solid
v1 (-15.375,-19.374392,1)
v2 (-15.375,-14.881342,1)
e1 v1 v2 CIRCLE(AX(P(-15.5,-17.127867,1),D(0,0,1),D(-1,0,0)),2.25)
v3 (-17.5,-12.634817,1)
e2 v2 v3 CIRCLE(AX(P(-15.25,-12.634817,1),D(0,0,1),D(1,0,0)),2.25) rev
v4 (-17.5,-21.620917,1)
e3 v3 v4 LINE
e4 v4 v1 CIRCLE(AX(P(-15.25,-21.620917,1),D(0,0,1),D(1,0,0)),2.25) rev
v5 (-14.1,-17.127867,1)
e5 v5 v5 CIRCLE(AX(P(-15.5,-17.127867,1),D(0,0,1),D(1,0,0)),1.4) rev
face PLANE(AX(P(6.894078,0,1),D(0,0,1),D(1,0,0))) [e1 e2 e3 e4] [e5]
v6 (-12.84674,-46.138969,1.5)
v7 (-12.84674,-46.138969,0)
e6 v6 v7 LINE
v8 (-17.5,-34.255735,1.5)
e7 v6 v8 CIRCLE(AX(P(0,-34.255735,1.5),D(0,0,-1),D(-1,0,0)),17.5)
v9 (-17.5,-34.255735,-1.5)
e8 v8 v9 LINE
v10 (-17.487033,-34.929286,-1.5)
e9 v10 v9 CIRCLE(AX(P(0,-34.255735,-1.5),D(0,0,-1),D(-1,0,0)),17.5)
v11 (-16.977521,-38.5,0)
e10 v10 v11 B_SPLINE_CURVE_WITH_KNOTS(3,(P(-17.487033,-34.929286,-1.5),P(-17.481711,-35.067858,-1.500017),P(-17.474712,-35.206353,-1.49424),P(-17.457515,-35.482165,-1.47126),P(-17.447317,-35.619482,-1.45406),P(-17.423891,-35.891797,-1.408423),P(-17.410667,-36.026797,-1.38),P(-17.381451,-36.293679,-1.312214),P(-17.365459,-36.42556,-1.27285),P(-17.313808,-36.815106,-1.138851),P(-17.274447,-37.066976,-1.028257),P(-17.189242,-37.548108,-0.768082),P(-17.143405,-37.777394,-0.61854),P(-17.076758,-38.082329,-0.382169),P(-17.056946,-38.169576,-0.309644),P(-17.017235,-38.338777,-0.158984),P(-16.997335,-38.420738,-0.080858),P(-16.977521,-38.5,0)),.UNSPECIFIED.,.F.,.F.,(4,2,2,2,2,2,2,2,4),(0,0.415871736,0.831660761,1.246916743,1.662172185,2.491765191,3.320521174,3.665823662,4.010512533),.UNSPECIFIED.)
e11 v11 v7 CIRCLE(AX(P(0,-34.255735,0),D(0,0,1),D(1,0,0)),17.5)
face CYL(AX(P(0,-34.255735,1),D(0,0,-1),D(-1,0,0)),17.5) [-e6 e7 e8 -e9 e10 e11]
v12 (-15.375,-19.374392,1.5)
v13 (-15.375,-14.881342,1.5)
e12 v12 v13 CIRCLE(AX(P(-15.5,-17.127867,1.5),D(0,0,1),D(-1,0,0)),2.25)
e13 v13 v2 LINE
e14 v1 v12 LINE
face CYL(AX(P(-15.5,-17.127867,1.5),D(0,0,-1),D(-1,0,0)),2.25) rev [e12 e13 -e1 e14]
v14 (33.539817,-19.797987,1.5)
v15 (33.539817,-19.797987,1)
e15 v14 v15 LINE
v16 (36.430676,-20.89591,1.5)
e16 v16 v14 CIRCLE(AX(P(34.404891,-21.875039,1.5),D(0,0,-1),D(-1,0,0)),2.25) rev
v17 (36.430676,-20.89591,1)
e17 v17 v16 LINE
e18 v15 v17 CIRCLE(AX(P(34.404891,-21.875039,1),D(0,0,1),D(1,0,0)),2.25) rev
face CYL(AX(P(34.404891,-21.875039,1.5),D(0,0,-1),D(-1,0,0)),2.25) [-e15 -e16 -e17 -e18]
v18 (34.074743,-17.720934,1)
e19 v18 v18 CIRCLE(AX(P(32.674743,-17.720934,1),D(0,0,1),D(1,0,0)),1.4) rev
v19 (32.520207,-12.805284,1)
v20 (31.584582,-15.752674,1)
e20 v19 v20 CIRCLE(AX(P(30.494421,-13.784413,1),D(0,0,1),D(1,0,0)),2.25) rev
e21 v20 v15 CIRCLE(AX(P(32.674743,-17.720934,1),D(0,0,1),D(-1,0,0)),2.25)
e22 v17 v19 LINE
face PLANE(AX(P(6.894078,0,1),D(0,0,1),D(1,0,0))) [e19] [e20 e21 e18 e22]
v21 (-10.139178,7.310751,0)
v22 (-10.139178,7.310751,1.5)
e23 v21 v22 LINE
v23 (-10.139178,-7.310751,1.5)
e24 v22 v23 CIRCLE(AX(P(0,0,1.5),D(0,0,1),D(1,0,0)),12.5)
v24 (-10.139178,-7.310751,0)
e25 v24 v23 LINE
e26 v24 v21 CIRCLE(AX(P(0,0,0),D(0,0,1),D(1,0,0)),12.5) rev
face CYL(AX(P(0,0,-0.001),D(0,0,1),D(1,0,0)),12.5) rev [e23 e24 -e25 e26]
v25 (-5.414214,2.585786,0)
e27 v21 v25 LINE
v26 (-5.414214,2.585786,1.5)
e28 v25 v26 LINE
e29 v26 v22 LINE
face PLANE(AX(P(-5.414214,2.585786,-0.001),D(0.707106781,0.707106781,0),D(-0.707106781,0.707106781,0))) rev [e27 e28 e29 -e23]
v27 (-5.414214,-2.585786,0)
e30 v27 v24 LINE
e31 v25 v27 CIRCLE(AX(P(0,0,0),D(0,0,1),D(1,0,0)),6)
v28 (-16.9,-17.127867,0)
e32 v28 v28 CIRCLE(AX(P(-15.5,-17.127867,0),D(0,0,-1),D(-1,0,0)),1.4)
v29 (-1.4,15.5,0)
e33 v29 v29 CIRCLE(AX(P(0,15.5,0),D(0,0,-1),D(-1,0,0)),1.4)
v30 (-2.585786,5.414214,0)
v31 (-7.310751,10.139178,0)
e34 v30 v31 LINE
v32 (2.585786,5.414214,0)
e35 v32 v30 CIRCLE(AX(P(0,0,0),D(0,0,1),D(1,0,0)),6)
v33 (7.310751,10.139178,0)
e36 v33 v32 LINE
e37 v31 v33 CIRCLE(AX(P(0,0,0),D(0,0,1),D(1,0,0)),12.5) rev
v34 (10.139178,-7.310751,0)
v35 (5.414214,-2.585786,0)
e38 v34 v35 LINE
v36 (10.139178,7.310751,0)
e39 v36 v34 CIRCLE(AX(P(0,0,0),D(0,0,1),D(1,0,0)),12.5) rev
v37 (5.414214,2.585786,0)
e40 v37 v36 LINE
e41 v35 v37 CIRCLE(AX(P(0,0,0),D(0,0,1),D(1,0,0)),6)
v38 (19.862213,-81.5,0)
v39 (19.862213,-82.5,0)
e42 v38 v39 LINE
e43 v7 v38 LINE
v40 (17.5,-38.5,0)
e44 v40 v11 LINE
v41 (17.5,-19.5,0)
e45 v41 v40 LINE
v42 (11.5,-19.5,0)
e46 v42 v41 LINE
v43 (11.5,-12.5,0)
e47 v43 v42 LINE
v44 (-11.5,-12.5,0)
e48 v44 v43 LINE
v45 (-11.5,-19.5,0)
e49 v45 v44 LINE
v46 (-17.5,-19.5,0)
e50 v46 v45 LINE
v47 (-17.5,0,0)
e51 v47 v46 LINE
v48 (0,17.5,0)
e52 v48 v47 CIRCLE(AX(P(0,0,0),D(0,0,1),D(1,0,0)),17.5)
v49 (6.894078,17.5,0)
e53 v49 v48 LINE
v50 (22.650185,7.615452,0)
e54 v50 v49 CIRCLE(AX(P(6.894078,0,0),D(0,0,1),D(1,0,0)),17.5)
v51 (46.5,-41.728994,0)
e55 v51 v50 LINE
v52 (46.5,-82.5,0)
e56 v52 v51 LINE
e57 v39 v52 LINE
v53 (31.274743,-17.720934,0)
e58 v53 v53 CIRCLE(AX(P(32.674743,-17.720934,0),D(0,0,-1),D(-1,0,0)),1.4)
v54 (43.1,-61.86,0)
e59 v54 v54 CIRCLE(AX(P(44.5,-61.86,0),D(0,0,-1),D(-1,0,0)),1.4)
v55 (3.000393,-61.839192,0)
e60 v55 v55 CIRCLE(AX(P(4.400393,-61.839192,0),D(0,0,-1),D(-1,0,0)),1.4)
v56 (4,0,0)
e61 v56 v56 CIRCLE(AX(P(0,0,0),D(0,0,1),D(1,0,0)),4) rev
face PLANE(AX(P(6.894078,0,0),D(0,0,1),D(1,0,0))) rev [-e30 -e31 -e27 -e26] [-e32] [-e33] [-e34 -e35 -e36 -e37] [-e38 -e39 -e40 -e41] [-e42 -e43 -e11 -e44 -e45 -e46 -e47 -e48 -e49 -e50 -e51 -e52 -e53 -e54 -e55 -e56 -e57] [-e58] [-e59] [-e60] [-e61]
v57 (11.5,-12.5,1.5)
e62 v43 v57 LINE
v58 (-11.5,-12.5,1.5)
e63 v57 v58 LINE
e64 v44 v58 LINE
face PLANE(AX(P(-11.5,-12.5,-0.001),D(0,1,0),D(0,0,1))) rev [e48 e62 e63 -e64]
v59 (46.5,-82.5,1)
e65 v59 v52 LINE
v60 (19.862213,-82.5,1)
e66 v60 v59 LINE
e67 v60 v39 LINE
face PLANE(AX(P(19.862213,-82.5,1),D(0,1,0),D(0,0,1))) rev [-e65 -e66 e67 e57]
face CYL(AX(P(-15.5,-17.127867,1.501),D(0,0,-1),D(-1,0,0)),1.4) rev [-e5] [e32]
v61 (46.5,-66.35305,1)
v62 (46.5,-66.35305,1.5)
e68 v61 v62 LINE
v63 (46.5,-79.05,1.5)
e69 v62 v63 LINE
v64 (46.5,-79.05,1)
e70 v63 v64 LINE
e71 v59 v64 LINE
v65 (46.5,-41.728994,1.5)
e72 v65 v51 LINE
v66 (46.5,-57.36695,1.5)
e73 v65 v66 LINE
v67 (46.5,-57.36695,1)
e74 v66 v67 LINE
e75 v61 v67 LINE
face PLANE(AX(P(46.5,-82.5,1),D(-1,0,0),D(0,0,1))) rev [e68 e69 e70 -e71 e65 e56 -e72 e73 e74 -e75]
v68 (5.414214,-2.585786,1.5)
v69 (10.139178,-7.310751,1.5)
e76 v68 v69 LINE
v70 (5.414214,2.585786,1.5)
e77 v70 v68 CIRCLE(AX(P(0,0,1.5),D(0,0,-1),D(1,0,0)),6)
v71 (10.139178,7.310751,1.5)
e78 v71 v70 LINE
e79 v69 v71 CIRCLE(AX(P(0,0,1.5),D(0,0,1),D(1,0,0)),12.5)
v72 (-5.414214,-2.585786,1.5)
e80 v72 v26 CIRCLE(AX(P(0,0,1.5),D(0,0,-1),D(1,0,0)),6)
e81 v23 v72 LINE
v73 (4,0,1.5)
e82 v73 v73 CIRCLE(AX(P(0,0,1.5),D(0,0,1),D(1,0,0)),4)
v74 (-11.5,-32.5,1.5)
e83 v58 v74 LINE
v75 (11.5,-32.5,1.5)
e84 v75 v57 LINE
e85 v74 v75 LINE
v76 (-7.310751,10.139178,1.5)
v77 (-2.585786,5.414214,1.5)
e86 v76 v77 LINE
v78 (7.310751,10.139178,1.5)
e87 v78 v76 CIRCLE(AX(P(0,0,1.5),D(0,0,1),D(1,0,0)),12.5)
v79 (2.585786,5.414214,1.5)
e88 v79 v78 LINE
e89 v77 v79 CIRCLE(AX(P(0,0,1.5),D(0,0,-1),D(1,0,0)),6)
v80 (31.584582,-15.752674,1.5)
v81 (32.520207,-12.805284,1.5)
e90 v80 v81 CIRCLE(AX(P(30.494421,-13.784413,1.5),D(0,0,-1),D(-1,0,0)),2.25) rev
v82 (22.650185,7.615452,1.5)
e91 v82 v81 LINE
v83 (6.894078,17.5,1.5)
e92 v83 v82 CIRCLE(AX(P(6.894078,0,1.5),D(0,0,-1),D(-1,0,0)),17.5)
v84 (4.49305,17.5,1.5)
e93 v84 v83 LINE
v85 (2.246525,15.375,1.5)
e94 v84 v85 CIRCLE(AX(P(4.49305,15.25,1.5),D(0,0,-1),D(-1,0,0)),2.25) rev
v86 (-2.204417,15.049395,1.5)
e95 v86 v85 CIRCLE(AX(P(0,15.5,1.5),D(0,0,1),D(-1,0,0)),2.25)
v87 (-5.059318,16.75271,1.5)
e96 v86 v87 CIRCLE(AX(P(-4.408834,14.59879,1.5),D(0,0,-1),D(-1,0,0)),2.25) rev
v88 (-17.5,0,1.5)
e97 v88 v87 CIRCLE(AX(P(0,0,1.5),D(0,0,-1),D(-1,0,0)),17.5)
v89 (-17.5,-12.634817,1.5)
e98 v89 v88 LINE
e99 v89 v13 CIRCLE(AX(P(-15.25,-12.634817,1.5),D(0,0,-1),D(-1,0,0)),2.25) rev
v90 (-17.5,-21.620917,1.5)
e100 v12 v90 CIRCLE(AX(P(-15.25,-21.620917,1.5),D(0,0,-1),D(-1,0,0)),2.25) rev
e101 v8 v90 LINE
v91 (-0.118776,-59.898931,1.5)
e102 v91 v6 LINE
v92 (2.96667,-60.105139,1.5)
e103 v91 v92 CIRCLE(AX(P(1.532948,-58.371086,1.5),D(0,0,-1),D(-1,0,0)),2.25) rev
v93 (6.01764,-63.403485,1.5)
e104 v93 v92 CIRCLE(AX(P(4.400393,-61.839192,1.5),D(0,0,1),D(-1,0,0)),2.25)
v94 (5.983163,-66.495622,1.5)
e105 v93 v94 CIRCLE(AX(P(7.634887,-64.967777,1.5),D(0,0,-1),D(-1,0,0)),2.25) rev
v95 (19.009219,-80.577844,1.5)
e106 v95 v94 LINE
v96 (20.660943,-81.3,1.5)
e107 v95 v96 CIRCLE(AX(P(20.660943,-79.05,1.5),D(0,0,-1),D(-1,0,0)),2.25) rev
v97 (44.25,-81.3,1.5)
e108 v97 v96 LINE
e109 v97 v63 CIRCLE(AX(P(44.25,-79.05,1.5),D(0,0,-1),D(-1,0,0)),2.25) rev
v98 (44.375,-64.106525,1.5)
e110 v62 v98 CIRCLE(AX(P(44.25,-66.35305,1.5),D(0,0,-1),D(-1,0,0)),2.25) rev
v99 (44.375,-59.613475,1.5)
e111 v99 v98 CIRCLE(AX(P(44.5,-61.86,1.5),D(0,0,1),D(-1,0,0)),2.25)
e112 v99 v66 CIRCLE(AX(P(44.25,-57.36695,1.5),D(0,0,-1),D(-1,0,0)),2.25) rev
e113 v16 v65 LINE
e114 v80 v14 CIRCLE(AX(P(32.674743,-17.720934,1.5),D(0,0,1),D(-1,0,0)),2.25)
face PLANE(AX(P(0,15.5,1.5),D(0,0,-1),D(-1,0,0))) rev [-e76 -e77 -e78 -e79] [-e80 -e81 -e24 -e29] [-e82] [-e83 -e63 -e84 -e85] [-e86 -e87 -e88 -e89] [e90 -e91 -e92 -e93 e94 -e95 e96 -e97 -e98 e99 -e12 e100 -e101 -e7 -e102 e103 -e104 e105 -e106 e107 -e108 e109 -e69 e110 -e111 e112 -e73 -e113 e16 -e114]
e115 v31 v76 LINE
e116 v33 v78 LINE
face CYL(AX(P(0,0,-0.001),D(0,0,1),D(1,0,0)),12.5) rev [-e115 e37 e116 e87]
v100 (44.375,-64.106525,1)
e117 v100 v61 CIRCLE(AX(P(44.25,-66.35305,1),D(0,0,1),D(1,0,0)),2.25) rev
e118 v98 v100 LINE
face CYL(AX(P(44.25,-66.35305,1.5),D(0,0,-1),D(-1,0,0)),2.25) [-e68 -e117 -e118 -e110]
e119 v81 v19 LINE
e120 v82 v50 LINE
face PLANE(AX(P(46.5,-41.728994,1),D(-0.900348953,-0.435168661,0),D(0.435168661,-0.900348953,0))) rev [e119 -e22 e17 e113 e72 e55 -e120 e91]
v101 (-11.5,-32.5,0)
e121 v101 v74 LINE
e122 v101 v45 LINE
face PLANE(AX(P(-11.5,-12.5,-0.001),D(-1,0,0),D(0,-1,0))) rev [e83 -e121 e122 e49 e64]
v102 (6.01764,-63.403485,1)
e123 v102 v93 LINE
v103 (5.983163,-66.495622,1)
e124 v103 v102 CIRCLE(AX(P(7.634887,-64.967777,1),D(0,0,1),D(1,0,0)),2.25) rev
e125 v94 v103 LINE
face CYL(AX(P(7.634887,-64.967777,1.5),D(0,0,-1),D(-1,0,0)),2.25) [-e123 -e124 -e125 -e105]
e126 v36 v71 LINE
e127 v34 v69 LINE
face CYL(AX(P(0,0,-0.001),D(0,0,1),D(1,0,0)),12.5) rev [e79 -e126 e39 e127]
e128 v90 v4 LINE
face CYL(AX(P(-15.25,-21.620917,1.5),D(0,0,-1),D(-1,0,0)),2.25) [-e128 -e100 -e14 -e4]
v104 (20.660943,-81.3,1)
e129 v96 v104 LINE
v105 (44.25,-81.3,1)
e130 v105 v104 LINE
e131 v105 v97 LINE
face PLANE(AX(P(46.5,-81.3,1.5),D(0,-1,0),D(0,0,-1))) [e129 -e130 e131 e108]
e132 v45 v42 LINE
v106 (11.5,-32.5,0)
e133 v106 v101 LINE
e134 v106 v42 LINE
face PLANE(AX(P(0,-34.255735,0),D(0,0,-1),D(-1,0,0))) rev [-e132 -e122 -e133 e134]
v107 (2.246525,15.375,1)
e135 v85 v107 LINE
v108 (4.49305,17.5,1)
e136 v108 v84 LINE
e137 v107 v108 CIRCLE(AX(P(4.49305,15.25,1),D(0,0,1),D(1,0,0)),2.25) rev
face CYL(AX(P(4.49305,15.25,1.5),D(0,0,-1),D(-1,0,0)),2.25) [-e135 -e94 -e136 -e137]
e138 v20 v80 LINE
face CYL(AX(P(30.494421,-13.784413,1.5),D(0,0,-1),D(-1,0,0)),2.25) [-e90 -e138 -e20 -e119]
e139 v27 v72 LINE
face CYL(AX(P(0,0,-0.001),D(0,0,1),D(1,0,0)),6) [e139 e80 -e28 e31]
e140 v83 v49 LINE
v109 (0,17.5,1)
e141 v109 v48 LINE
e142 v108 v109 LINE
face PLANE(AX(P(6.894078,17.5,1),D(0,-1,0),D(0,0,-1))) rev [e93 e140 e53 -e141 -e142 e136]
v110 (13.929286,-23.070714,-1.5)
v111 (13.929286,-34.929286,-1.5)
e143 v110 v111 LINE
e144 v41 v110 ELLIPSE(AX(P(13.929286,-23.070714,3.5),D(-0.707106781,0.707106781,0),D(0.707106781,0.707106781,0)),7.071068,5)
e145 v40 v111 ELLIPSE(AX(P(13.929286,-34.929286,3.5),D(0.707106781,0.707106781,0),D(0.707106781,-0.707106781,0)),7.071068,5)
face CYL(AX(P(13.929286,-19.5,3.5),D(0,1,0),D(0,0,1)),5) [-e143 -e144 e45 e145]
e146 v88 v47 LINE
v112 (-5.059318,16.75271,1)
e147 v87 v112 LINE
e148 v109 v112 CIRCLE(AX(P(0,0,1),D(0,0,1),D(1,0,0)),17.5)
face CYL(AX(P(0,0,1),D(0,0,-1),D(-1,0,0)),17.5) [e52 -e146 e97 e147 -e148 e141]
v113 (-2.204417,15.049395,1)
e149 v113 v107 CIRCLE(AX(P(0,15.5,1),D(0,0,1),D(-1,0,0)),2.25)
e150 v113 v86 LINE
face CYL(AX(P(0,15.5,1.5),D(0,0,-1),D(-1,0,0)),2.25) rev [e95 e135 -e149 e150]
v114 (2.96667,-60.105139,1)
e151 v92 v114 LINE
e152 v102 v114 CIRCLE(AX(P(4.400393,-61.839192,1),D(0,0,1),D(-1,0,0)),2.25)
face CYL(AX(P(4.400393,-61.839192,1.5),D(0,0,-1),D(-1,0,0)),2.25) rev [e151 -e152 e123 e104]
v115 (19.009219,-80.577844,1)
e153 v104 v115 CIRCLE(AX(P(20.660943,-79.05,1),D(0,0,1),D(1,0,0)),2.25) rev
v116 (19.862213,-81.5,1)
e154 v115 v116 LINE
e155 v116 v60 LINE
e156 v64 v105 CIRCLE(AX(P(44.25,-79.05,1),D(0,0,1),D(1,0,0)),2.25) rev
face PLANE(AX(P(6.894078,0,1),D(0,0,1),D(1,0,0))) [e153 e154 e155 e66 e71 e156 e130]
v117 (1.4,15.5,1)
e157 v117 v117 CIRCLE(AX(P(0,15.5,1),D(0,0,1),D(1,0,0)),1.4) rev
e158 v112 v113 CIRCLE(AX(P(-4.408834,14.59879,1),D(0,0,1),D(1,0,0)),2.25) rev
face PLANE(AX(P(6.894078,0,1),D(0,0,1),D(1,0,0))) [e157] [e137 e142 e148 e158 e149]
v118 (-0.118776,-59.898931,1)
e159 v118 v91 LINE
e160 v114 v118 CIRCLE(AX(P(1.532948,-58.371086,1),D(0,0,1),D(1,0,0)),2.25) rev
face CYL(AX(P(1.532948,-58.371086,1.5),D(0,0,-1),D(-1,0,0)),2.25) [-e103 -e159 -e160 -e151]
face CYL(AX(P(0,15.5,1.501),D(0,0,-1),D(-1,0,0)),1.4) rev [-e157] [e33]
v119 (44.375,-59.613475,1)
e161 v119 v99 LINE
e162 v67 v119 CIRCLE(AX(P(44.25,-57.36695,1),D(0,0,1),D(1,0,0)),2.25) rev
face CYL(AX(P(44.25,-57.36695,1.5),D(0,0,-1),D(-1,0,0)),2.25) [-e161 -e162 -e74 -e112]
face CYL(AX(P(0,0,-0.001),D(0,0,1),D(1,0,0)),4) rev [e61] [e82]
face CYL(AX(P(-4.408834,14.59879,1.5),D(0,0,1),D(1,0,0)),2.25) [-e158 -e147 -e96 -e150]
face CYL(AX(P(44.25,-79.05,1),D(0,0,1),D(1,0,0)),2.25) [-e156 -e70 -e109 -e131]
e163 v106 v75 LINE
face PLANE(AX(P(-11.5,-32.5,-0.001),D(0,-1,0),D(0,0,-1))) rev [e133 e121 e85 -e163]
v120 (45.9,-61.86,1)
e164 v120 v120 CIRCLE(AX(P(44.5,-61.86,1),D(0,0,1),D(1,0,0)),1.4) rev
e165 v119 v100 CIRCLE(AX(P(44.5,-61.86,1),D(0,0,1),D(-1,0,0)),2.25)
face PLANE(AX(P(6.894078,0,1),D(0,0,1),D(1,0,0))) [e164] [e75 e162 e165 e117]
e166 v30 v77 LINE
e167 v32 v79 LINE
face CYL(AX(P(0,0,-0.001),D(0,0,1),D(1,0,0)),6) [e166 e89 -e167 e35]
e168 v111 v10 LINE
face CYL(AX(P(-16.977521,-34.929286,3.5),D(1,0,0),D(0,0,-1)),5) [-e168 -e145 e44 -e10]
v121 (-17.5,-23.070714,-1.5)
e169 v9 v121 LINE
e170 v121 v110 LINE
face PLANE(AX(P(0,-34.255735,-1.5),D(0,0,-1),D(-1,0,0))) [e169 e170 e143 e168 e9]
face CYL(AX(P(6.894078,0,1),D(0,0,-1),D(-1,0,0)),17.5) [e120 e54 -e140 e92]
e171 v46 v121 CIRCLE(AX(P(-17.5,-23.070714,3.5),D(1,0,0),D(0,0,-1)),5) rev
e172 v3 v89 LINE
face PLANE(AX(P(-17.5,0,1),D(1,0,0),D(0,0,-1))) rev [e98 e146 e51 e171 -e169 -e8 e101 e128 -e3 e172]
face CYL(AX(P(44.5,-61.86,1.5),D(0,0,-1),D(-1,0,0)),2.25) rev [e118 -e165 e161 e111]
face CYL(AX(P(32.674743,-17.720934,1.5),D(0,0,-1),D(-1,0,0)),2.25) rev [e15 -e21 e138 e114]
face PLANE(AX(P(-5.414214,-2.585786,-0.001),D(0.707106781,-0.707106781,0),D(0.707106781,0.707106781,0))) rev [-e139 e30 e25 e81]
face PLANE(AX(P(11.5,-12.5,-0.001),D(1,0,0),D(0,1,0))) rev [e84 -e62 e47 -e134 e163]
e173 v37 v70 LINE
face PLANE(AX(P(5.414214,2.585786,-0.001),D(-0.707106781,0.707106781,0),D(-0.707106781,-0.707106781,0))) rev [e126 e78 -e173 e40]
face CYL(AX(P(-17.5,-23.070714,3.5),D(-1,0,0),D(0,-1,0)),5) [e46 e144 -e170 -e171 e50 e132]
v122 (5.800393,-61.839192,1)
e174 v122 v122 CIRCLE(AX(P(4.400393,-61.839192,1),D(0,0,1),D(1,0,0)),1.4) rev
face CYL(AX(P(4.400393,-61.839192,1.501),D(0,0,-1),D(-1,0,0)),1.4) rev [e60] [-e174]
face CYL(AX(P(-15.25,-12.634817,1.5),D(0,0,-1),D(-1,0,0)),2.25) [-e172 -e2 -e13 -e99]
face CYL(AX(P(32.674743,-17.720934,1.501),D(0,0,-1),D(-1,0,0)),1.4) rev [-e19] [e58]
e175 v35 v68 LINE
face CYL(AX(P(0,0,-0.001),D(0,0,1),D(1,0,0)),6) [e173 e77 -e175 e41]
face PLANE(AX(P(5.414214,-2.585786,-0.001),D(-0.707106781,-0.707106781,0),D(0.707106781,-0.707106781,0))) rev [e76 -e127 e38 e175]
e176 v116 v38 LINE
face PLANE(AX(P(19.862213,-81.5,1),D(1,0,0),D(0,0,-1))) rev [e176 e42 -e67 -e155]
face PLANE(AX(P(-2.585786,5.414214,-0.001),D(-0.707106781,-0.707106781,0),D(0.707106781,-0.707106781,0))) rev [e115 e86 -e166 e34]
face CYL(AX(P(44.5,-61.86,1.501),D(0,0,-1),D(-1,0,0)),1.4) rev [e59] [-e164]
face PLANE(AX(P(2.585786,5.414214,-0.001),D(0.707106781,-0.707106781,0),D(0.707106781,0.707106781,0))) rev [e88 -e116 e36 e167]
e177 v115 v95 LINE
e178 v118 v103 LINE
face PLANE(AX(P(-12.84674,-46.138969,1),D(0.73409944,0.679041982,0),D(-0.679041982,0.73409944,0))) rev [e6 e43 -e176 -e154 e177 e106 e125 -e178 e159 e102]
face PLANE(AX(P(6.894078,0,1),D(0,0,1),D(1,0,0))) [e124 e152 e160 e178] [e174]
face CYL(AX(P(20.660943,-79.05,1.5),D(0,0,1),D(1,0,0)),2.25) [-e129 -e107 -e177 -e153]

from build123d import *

# Parameters (mm, degrees)
EXTRUDE_1_DEPTH     = 1
EXTRUDE_2_DEPTH     = 0.5
FILLET_1_R          = 2.25
CUT_EXTRUDE_1_REACH = 96.714
SKETCH_3_R          = 1.4
CUT_EXTRUDE_2_REACH = 96.714
SKETCH_4_R          = 4
SKETCH_4_W          = 23
SKETCH_4_H          = 20
EXTRUDE_START       = 1.5
EXTRUDE_3_DEPTH     = 1.5
FILLET_2_R          = 5


with BuildPart() as part:
    # 스케치1 → 보스-돌출1 (new body)
    with BuildSketch(Plane.XY):
        with BuildLine():
            Line((46.5, -82.5), (46.5, -41.72899408))
            Line((46.5, -41.72899408), (22.650184607, 7.615451559))
            ThreePointArc((22.650184607, 7.615451559), (16.194067118, 14.824311152), (6.894077933, 17.5))
            Line((6.894077933, 17.5), (0, 17.5))
            ThreePointArc((0, 17.5), (-12.374368671, 12.374368671), (-17.5, 0))
            Line((-17.5, 0), (-17.5, -34.255734548))
            ThreePointArc((-17.5, -34.255734548), (-16.295213306, -40.636645401), (-12.846740193, -46.138969227))
            Line((-12.846740193, -46.138969227), (19.862213273, -81.5))
            Line((19.862213273, -81.5), (19.862213273, -82.5))
            Line((19.862213273, -82.5), (46.5, -82.5))
        make_face()
    extrude(amount=EXTRUDE_1_DEPTH)

    # 스케치2 → 보스-돌출2 (add)
    with BuildSketch(Plane(origin=(0, 0, 1), x_dir=(-1, 0, 0), z_dir=(0, 0, -1))):
        with BuildLine():
            Line((-46.5, -81.3), (-19.677213273, -81.3))
            Line((-19.677213273, -81.3), (-4.460038224, -64.848999948))
            Line((-4.460038224, -64.848999948), (-5.928237104, -63.490915985))
            ThreePointArc((-5.928237104, -63.490915985), (-6.052116384, -60.311347787), (-2.872548186, -60.187468507))
            Line((-2.872548186, -60.187468507), (-1.404349307, -61.54555247))
            Line((-1.404349307, -61.54555247), (12.846740193, -46.138969227))
            ThreePointArc((12.846740193, -46.138969227), (16.295213306, -40.636645401), (17.5, -34.255734548))
            Line((17.5, -34.255734548), (17.5, -19.377867274))
            Line((17.5, -19.377867274), (15.5, -19.377867274))
            ThreePointArc((15.5, -19.377867274), (13.25, -17.127867274), (15.5, -14.877867274))
            Line((15.5, -14.877867274), (17.5, -14.877867274))
            Line((17.5, -14.877867274), (17.5, 0))
            ThreePointArc((17.5, 0), (13.145816825, 11.551515052), (2.25, 17.354754392))
            Line((2.25, 17.354754392), (2.25, 15.5))
            ThreePointArc((2.25, 15.5), (0, 13.25), (-2.25, 15.5))
            Line((-2.25, 15.5), (-2.25, 17.5))
            Line((-2.25, 17.5), (-6.894077933, 17.5))
            ThreePointArc((-6.894077933, 17.5), (-16.194067118, 14.824311152), (-22.650184607, 7.615451559))
            Line((-22.650184607, 7.615451559), (-33.49631177, -14.824811536))
            Line((-33.49631177, -14.824811536), (-31.695613865, -15.695148857))
            ThreePointArc((-31.695613865, -15.695148857), (-30.648958207, -18.700063487), (-33.653872837, -19.746719145))
            Line((-33.653872837, -19.746719145), (-35.454570743, -18.876381824))
            Line((-35.454570743, -18.876381824), (-46.5, -41.72899408))
            Line((-46.5, -41.72899408), (-46.5, -59.61))
            Line((-46.5, -59.61), (-44.5, -59.61))
            ThreePointArc((-44.5, -59.61), (-42.25, -61.86), (-44.5, -64.11))
            Line((-44.5, -64.11), (-46.5, -64.11))
            Line((-46.5, -64.11), (-46.5, -81.3))
        make_face()
    extrude(amount=-EXTRUDE_2_DEPTH)

    # 필렛1
    # the kernel refuses this fillet: 2.25 mm, written as the material it takes off along each edge
    with BuildSketch(Plane(origin=(-17.5, -14.877867274, 1), x_dir=(0, 1, 0), z_dir=(0, 0, 1)), Plane(origin=(35.454570743, -18.876381824, 1), x_dir=(0.4351686605402659, -0.9003489528419473, 0), z_dir=(0, 0, 1)), Plane(origin=(46.5, -64.11, 1), x_dir=(0, -1, 0), z_dir=(0, 0, 1)), Plane(origin=(1.404349307, -61.54555247, 1), x_dir=(-0.6790419816174302, 0.7340994395864046, 0), z_dir=(0, 0, 1))) as fillet_1_piece_1:
        with BuildLine():
            CenterArc((2.243050189, -2.25), FILLET_1_R, 90, 86.815261463)
            Line((-0.003474906, -2.125), (-0.228127415, -2.1125))
            ThreePointArc((-0.228127415, -2.1125), (-0.225, -2), (-0.225, 0))
            Line((-0.225, 0), (0, 0.225))
            Line((0, 0.225), (2.243050189, 0.225))
            Line((2.243050189, 0.225), (2.243050189, 0))
        make_face()
    extrude(amount=6.107625472, mode=Mode.SUBTRACT)
    with BuildSketch(Plane(origin=(-17.5, -19.377867274, 1), x_dir=(0, -1, 0), z_dir=(0, 0, 1)), Plane(origin=(33.49631177, -14.824811536, 1), x_dir=(-0.4351686605402757, 0.9003489528419424, 0), z_dir=(0, 0, 1)), Plane(origin=(46.5, -59.61, 1), x_dir=(0, 1, 0), z_dir=(0, 0, 1)), Plane(origin=(4.460038224, -64.848999948, 1), x_dir=(0.679041981617429, -0.7340994395864059, 0), z_dir=(0, 0, 1))) as fillet_1_piece_2:
        with BuildLine():
            CenterArc((2.243050189, 2.25), FILLET_1_R, 183.184738537, 86.815261463)
            Line((-0.003474906, 2.125), (-0.228127415, 2.1125))
            ThreePointArc((-0.228127415, 2.1125), (-0.225, 2), (-0.225, 0))
            Line((-0.225, 0), (0, -0.225))
            Line((0, -0.225), (2.243050189, -0.225))
            Line((2.243050189, -0.225), (2.243050189, 0))
        make_face()
    extrude(amount=6.107625472, mode=Mode.SUBTRACT)
    with BuildSketch(Plane(origin=(2.25, 17.5, 1), x_dir=(-0.0016352474835574222, -0.99999866298194, 0), z_dir=(0, 0, 1))) as fillet_1_piece_3:
        with BuildLine():
            CenterArc((2.24632905, 2.246726497), FILLET_1_R, 180.093692821, 86.815261463)
            Line((-0.003667942, 2.24304719), (-0.228667641, 2.242679259))
            Line((-0.228667641, 2.242679259), (-0.224999699, -0.000367931))
            Line((-0.224999699, -0.000367931), (0.000367931, -0.224999699))
            ThreePointArc((0.000367931, -0.224999699), (2.000365257, -0.221729204), (2.11287022, -0.22467265))
            Line((2.11287022, -0.22467265), (2.125002841, 0))
        make_face()
    extrude(amount=6.107625472, mode=Mode.SUBTRACT)
    with BuildSketch(Plane(origin=(-2.25, 17.354754392, 1), x_dir=(-0.9777990320246813, -0.20954487102192756, 0), z_dir=(0, 0, 1))) as fillet_1_piece_4:
        with BuildLine():
            CenterArc((2.688404361, 2.242406315), FILLET_1_R, 179.456997301, 95.251636128)
            Line((0.438505404, 2.263729662), (0.213515509, 2.265861997))
            ThreePointArc((0.213515509, 2.265861997), (0.168649488, 1.860724645), (-0.220004782, 0.047147596))
            Line((-0.220004782, 0.047147596), (-0.018469954, -0.224240631))
            ThreePointArc((-0.018469954, -0.224240631), (1.436551949, -0.284061995), (2.891573851, -0.224240631))
            Line((2.891573851, -0.224240631), (2.873103897, 0))
        make_face()
    extrude(amount=7.682759743, mode=Mode.SUBTRACT)
    with BuildSketch(Plane(origin=(19.677213273, -81.3, 1), x_dir=(-0.6790419816174232, 0.7340994395864112, 0), z_dir=(0, 0, 1))) as fillet_1_piece_5:
        with BuildLine():
            CenterArc((FILLET_1_R * 0.437213272583, -FILLET_1_R), FILLET_1_R, 90, 47.231174608)
            Line((-FILLET_1_R * 0.296886167004, -FILLET_1_R * 0.320958018383), (0, 0))
            Line((0, 0), (FILLET_1_R * 0.437213272583, 0))
        make_face()
    extrude(amount=2.959324658, mode=Mode.SUBTRACT)
    with BuildSketch(Plane(origin=(46.5, -81.3, 1), x_dir=(0, 1, 0), z_dir=(0, 0, 1))) as fillet_1_piece_6:
        with BuildLine():
            CenterArc((FILLET_1_R, FILLET_1_R), FILLET_1_R, 180, 90)
            Line((0, FILLET_1_R), (0, 0))
            Line((0, 0), (FILLET_1_R, 0))
        make_face()
    extrude(amount=6.125, mode=Mode.SUBTRACT)

    # 스케치3 → 컷-돌출1 (cut, up to next)
    with BuildSketch(Plane(origin=(0, 0, 0), x_dir=(-1, 0, 0), z_dir=(0, 0, -1)), mode=Mode.PRIVATE) as cut_extrude_1_sk1:
        with Locations((0, 15.5)):
            Circle(SKETCH_3_R)
    cut_extrude_1_tool1 = extrude(cut_extrude_1_sk1.sketch, amount=-CUT_EXTRUDE_1_REACH, mode=Mode.PRIVATE) & part.part
    # 스케치3 → 컷-돌출1 (cut, up to next)
    with BuildSketch(Plane(origin=(0, 0, 0), x_dir=(-1, 0, 0), z_dir=(0, 0, -1)), mode=Mode.PRIVATE) as cut_extrude_1_sk2:
        with Locations((15.5, -17.127867274)):
            Circle(SKETCH_3_R)
    cut_extrude_1_tool2 = extrude(cut_extrude_1_sk2.sketch, amount=-CUT_EXTRUDE_1_REACH, mode=Mode.PRIVATE) & part.part
    # 스케치3 → 컷-돌출1 (cut, up to next)
    with BuildSketch(Plane(origin=(0, 0, 0), x_dir=(-1, 0, 0), z_dir=(0, 0, -1)), mode=Mode.PRIVATE) as cut_extrude_1_sk3:
        with Locations((-32.674743351, -17.720934001)):
            Circle(SKETCH_3_R)
    cut_extrude_1_tool3 = extrude(cut_extrude_1_sk3.sketch, amount=-CUT_EXTRUDE_1_REACH, mode=Mode.PRIVATE) & part.part
    # 스케치3 → 컷-돌출1 (cut, up to next)
    with BuildSketch(Plane(origin=(0, 0, 0), x_dir=(-1, 0, 0), z_dir=(0, 0, -1)), mode=Mode.PRIVATE) as cut_extrude_1_sk4:
        with Locations((-44.5, -61.86)):
            Circle(SKETCH_3_R)
    cut_extrude_1_tool4 = extrude(cut_extrude_1_sk4.sketch, amount=-CUT_EXTRUDE_1_REACH, mode=Mode.PRIVATE) & part.part
    # 스케치3 → 컷-돌출1 (cut, up to next)
    with BuildSketch(Plane(origin=(0, 0, 0), x_dir=(-1, 0, 0), z_dir=(0, 0, -1)), mode=Mode.PRIVATE) as cut_extrude_1_sk5:
        with Locations((-4.400392645, -61.839192246)):
            Circle(SKETCH_3_R)
    cut_extrude_1_tool5 = extrude(cut_extrude_1_sk5.sketch, amount=-CUT_EXTRUDE_1_REACH, mode=Mode.PRIVATE) & part.part
    add(cut_extrude_1_tool1.solids().sort_by_distance((0, 15.5, 0))[0], mode=Mode.SUBTRACT)
    add(cut_extrude_1_tool2.solids().sort_by_distance((-15.5, -17.127867, 0))[0], mode=Mode.SUBTRACT)
    add(cut_extrude_1_tool3.solids().sort_by_distance((32.674743, -17.720934, 0))[0], mode=Mode.SUBTRACT)
    add(cut_extrude_1_tool4.solids().sort_by_distance((44.5, -61.86, 0))[0], mode=Mode.SUBTRACT)
    add(cut_extrude_1_tool5.solids().sort_by_distance((4.400393, -61.839192, 0))[0], mode=Mode.SUBTRACT)

    # 스케치4 → 컷-돌출2 (cut, up to next)
    with BuildSketch(Plane.XY.offset(1.5), mode=Mode.PRIVATE) as cut_extrude_2_sk1:
        Circle(SKETCH_4_R)
    cut_extrude_2_tool1 = extrude(cut_extrude_2_sk1.sketch, amount=-CUT_EXTRUDE_2_REACH, mode=Mode.PRIVATE) & part.part
    # 스케치4 → 컷-돌출2 (cut, up to next)
    with BuildSketch(Plane.XY.offset(1.5), mode=Mode.PRIVATE) as cut_extrude_2_sk2:
        with Locations((0, -22.5)):
            Rectangle(SKETCH_4_W, SKETCH_4_H)
    cut_extrude_2_tool2 = extrude(cut_extrude_2_sk2.sketch, amount=-CUT_EXTRUDE_2_REACH, mode=Mode.PRIVATE) & part.part
    # 스케치4 → 컷-돌출2 (cut, up to next)
    with BuildSketch(Plane.XY.offset(1.5), mode=Mode.PRIVATE) as cut_extrude_2_sk3:
        with BuildLine():
            Line((-5.414213562, -2.585786438), (-10.139177746, -7.310750621))
            ThreePointArc((-10.139177746, -7.310750621), (-12.5, 0), (-10.139177746, 7.310750621))
            Line((-10.139177746, 7.310750621), (-5.414213562, 2.585786438))
            ThreePointArc((-5.414213562, 2.585786438), (-6, 0), (-5.414213562, -2.585786438))
        make_face()
    cut_extrude_2_tool3 = extrude(cut_extrude_2_sk3.sketch, amount=-CUT_EXTRUDE_2_REACH, mode=Mode.PRIVATE) & part.part
    # 스케치4 → 컷-돌출2 (cut, up to next)
    with BuildSketch(Plane.XY.offset(1.5), mode=Mode.PRIVATE) as cut_extrude_2_sk4:
        with BuildLine():
            Line((5.414213562, -2.585786438), (10.139177746, -7.310750621))
            ThreePointArc((10.139177746, -7.310750621), (12.5, 0), (10.139177746, 7.310750621))
            Line((10.139177746, 7.310750621), (5.414213562, 2.585786438))
            ThreePointArc((5.414213562, 2.585786438), (6, 0), (5.414213562, -2.585786438))
        make_face()
    cut_extrude_2_tool4 = extrude(cut_extrude_2_sk4.sketch, amount=-CUT_EXTRUDE_2_REACH, mode=Mode.PRIVATE) & part.part
    # 스케치4 → 컷-돌출2 (cut, up to next)
    with BuildSketch(Plane.XY.offset(1.5), mode=Mode.PRIVATE) as cut_extrude_2_sk5:
        with BuildLine():
            Line((2.585786438, 5.414213562), (7.310750621, 10.139177746))
            ThreePointArc((7.310750621, 10.139177746), (0, 12.5), (-7.310750621, 10.139177746))
            Line((-7.310750621, 10.139177746), (-2.585786438, 5.414213562))
            ThreePointArc((-2.585786438, 5.414213562), (0, 6), (2.585786438, 5.414213562))
        make_face()
    cut_extrude_2_tool5 = extrude(cut_extrude_2_sk5.sketch, amount=-CUT_EXTRUDE_2_REACH, mode=Mode.PRIVATE) & part.part
    add(cut_extrude_2_tool1.solids().sort_by_distance((0, 0, 1.5))[0], mode=Mode.SUBTRACT)
    add(cut_extrude_2_tool2.solids().sort_by_distance((0, -22.5, 1.5))[0], mode=Mode.SUBTRACT)
    add(cut_extrude_2_tool3.solids().sort_by_distance((-9.239512, 0, 1.5))[0], mode=Mode.SUBTRACT)
    add(cut_extrude_2_tool4.solids().sort_by_distance((9.239512, 0, 1.5))[0], mode=Mode.SUBTRACT)
    add(cut_extrude_2_tool5.solids().sort_by_distance((0, 9.239512, 1.5))[0], mode=Mode.SUBTRACT)

    # 스케치6 → 보스-돌출3 (add)
    with BuildSketch(Plane(origin=(0, 0, 0), x_dir=(-1, 0, 0), z_dir=(0, 0, -1)).offset(EXTRUDE_START)):
        with BuildLine():
            Line((17.5, -19.5), (-17.5, -19.5))
            Line((-17.5, -19.5), (-17.5, -38.5))
            Line((-17.5, -38.5), (16.977520749, -38.5))
            ThreePointArc((16.977520749, -38.5), (17.368889042, -36.393886425), (17.5, -34.255734548))
            Line((17.5, -34.255734548), (17.5, -19.5))
        make_face()
    extrude(amount=-EXTRUDE_3_DEPTH)

    # 필렛2
    # the kernel refuses this fillet: 5 mm, written as the material it takes off along each edge
    with BuildSketch(Plane(origin=(-26.426785536, -19.5, -1.5), x_dir=(0, 0, 1), z_dir=(1, 0, 0))) as fillet_2_piece_1:
        with BuildLine():
            CenterArc((5, 3.570714214), FILLET_2_R, 180, 45.572995999)
            Line((0, 3.570714214), (-0.1, 3.570714214))
            Line((-0.1, 3.570714214), (-0.1, 0))
            Line((-0.1, 0), (0, -0.1))
            ThreePointArc((0, -0.1), (0.75, -0.1), (1.43, -0.071414284))
            Line((1.43, -0.071414284), (1.5, 0))
        make_face()
    extrude(amount=52.853571071, mode=Mode.SUBTRACT)
    with BuildSketch(Plane(origin=(17.5, -10.573214464, -1.5), x_dir=(0, 0, 1), z_dir=(0, -1, 0))) as fillet_2_piece_2:
        with BuildLine():
            CenterArc((5, 3.570714214), FILLET_2_R, 180, 45.572995999)
            Line((0, 3.570714214), (-0.1, 3.570714214))
            Line((-0.1, 3.570714214), (-0.1, 0))
            Line((-0.1, 0), (0, -0.1))
            ThreePointArc((0, -0.1), (0.75, -0.1), (1.43, -0.071414284))
            Line((1.43, -0.071414284), (1.5, 0))
        make_face()
    extrude(amount=36.853571071, mode=Mode.SUBTRACT)
    with BuildSketch(Plane(origin=(26.426785536, -38.5, -1.5), x_dir=(0, 0, 1), z_dir=(-1, 0, 0))) as fillet_2_piece_3:
        with BuildLine():
            CenterArc((5, 3.570714214), FILLET_2_R, 180, 45.572995999)
            Line((0, 3.570714214), (-0.1, 3.570714214))
            Line((-0.1, 3.570714214), (-0.1, 0))
            Line((-0.1, 0), (0, -0.1))
            ThreePointArc((0, -0.1), (0.75, -0.1), (1.43, -0.071414284))
            Line((1.43, -0.071414284), (1.5, 0))
        make_face()
    extrude(amount=52.33109182, mode=Mode.SUBTRACT)


solid = part.part
